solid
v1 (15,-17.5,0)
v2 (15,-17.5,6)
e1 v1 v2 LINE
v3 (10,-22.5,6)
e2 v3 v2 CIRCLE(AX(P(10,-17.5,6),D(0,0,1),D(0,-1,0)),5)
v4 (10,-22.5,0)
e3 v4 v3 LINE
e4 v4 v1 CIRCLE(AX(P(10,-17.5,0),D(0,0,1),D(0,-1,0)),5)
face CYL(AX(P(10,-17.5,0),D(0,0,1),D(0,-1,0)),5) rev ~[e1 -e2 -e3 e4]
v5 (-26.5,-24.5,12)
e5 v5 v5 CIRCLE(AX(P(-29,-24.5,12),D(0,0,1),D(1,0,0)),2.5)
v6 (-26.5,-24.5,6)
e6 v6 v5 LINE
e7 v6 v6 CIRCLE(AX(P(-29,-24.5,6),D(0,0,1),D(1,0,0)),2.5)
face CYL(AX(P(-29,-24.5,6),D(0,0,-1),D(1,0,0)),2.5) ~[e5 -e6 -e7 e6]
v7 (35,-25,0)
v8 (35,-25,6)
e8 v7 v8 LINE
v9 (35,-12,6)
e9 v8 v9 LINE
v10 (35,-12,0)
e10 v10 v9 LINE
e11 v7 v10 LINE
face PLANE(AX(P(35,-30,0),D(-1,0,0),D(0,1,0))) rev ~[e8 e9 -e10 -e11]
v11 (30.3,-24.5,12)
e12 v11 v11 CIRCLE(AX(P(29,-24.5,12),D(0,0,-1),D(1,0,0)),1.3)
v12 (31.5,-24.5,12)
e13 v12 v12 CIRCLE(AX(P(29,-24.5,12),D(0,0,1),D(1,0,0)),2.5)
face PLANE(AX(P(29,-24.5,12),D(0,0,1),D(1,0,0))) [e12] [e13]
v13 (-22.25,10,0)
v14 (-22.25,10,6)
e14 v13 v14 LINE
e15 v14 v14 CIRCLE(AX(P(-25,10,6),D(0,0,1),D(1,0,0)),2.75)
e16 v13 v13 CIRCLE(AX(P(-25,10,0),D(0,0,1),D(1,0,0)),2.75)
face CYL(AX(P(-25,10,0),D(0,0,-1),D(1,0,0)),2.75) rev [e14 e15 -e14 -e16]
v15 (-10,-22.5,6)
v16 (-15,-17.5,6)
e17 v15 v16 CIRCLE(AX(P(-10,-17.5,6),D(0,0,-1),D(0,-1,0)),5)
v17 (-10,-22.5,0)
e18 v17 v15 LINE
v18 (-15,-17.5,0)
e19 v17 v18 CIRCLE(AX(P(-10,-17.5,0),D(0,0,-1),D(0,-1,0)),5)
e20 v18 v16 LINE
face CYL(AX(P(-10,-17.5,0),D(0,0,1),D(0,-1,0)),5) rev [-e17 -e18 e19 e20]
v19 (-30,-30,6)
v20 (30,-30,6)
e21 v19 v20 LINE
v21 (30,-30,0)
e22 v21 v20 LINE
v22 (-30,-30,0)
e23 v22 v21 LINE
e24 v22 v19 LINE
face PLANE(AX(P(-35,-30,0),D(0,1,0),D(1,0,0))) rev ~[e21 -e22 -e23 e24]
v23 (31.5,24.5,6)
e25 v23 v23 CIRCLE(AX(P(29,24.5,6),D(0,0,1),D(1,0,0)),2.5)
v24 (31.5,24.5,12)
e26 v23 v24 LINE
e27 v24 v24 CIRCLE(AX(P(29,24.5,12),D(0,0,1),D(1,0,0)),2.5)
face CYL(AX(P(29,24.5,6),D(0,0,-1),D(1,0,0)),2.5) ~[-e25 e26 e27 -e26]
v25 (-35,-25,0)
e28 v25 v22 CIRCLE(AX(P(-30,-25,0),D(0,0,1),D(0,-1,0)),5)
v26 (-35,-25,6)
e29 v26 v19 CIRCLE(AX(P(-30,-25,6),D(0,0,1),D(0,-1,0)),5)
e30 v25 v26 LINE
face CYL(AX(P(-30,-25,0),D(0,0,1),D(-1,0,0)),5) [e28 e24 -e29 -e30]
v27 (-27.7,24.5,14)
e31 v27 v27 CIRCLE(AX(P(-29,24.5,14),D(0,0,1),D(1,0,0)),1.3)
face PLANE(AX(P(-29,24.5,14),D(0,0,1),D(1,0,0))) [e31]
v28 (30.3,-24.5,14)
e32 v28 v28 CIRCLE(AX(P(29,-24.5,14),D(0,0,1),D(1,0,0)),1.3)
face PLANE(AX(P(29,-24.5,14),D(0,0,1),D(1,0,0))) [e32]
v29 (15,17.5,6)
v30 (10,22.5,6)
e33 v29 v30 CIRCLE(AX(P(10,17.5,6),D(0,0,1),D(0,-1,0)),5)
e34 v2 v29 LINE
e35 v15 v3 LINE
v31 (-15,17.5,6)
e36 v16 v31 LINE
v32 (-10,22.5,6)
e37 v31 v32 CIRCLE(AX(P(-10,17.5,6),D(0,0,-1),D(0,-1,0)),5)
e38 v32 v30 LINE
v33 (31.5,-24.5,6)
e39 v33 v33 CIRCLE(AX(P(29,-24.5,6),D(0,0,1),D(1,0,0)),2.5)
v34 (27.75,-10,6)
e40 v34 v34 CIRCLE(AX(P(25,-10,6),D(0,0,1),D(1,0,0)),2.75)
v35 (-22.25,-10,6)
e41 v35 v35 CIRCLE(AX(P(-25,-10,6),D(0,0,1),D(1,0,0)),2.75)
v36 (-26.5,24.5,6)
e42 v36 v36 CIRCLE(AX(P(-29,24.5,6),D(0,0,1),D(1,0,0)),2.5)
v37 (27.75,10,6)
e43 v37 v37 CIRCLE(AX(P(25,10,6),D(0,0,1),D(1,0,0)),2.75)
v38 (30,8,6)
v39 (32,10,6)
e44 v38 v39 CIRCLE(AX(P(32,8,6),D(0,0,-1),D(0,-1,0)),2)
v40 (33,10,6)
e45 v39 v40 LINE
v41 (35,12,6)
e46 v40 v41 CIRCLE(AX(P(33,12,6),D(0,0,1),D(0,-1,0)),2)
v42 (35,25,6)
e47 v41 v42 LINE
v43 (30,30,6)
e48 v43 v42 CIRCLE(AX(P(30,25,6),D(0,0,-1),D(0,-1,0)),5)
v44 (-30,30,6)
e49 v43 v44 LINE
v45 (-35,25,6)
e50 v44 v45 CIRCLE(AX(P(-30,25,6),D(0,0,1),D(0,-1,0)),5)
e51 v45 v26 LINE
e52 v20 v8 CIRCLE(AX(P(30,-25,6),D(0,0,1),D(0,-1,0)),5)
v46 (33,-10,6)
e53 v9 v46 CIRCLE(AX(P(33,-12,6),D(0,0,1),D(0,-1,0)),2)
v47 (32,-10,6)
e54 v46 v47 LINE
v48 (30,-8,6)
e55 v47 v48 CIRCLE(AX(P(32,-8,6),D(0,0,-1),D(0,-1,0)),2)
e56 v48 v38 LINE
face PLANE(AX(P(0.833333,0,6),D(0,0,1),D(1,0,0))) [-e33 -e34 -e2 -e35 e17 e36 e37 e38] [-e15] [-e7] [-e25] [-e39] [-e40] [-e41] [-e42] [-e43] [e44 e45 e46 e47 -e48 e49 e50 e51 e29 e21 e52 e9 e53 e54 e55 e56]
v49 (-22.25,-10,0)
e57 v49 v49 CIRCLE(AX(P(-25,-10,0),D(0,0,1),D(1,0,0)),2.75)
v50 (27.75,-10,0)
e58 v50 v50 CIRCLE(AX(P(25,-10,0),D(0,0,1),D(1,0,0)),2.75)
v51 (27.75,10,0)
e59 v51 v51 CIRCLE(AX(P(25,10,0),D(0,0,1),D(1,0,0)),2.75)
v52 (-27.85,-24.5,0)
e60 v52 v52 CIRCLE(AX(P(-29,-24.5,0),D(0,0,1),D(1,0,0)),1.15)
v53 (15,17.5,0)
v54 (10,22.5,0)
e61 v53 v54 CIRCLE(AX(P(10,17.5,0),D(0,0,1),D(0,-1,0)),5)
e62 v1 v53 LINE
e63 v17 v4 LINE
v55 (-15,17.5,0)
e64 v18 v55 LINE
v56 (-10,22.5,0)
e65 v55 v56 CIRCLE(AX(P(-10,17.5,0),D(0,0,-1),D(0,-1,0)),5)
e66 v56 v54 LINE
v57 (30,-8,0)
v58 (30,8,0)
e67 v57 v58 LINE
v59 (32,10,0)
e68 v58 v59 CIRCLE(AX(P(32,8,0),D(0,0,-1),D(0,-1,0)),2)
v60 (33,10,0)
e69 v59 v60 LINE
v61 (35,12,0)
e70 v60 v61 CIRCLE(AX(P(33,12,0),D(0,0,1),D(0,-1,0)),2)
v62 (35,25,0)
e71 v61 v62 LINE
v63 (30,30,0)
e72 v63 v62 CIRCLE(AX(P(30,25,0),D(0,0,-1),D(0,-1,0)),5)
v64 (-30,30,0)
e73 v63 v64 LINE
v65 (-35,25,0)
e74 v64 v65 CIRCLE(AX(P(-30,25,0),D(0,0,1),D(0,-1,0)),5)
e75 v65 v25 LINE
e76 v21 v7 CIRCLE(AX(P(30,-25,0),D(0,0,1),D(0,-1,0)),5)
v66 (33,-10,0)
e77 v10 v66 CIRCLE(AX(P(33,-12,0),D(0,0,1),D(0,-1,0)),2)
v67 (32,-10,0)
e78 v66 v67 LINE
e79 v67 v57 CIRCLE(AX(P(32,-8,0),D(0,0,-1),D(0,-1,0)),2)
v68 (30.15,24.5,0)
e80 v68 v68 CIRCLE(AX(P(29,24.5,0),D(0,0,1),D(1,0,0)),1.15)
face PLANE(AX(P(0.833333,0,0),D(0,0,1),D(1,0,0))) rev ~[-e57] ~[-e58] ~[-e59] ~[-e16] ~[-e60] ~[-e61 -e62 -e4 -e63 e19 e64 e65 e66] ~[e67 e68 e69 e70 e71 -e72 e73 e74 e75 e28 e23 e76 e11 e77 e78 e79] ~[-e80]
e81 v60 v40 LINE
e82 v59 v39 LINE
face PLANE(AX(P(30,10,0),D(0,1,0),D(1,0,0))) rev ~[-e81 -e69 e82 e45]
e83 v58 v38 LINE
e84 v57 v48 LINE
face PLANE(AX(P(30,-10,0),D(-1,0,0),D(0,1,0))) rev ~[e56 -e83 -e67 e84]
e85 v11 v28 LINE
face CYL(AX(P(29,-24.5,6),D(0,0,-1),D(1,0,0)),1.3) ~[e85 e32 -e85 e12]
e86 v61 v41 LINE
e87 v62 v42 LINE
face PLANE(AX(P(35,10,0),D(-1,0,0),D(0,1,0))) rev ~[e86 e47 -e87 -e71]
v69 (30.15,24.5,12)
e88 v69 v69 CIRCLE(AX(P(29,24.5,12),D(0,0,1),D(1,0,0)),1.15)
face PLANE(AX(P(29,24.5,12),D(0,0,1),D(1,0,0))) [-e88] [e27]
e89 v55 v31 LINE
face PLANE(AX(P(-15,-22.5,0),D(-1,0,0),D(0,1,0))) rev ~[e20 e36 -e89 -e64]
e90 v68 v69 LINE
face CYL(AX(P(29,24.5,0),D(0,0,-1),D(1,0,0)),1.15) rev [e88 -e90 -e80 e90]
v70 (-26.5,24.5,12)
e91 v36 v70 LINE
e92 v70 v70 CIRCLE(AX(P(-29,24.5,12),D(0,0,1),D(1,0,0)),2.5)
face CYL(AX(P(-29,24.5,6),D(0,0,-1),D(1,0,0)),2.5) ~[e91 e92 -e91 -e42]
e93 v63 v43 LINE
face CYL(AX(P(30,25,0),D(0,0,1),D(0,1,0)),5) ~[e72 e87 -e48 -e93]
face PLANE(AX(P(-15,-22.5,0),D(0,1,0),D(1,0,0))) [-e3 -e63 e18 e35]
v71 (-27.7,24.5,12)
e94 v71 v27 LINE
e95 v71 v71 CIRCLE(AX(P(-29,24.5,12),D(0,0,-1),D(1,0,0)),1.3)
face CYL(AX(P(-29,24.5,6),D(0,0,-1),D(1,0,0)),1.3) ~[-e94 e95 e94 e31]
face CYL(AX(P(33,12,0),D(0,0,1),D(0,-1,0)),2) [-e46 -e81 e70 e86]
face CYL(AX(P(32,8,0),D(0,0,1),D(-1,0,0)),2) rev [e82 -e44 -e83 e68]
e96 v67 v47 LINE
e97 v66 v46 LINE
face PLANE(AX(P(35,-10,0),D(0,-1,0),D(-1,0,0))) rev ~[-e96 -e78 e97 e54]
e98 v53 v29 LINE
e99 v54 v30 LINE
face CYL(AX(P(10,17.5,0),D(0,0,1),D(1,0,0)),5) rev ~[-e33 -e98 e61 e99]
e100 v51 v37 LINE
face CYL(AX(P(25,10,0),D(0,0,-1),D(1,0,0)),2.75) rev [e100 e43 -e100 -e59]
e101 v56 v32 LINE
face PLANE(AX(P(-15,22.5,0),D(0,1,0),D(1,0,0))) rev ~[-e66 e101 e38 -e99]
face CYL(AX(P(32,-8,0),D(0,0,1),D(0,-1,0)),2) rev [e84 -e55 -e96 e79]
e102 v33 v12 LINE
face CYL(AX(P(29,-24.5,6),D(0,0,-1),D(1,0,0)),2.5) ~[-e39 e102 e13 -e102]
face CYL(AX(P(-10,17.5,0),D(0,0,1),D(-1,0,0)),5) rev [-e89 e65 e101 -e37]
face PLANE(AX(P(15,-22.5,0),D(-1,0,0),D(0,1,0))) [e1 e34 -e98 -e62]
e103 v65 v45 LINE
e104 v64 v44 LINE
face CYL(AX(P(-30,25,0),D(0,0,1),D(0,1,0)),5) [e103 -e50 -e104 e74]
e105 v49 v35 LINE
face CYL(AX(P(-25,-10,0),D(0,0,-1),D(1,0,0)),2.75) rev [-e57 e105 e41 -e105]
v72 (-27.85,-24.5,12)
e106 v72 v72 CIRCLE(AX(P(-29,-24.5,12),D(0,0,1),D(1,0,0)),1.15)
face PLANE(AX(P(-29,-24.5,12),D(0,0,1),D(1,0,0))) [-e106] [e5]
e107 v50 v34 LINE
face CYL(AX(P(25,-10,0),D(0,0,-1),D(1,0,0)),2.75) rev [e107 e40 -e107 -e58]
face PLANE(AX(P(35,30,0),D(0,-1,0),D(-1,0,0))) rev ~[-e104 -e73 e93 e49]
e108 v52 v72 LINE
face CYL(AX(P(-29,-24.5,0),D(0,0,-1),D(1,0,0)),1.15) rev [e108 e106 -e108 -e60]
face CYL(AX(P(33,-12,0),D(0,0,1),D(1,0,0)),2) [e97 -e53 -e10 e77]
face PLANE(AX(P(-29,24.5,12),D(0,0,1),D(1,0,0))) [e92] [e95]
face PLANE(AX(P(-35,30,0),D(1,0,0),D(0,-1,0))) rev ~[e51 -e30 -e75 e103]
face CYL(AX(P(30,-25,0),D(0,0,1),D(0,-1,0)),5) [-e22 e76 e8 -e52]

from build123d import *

# Parameters (mm, degrees)
F0_R     = 1.15
F0_R_2   = 2.75
F0_W     = 30
F0_H     = 45
F1_DEPTH = 6
F2_R     = 5
F4_R     = 2.5
F5_DEPTH = 6
F3_R     = 1.3
F6_DEPTH = 8
F7_R     = 1.15
F8_DEPTH = 25
F9_R     = 2


# Not quite as in the source:
# - a feature names something its author has since deleted; it is built from what else it names


with BuildPart() as f1:
    # F0 (on Top) → F1 (new body)
    with BuildSketch(Plane.XY):
        Polygon((35, 30), (-35, 30), (-35, -30), (35, -30), (35, -10), (30, -10), (30, 10), (35, 10), align=None)
        with Locations((-29, -24.5)):
            Circle(F0_R, mode=Mode.SUBTRACT)
        with Locations((-25, -10)):
            Circle(F0_R_2, mode=Mode.SUBTRACT)
        with Locations((25, -10)):
            Circle(F0_R_2, mode=Mode.SUBTRACT)
        with Locations((-25, 10)):
            Circle(F0_R_2, mode=Mode.SUBTRACT)
        Rectangle(F0_W, F0_H, mode=Mode.SUBTRACT)
        with Locations((25, 10)):
            Circle(F0_R_2, mode=Mode.SUBTRACT)
        with Locations((29, 24.5)):
            Circle(F0_R, mode=Mode.SUBTRACT)
    extrude(amount=F1_DEPTH)

    # F2
    f2_edges = [f1.edges().sort_by_distance(p)[0] for p in [
        (-35, -30, 3),
        (-35, 30, 3),
        (-15, 22.5, 3),
        (15, 22.5, 3),
        (15, -22.5, 3),
        (-15, -22.5, 3),
        (35, 30, 3),
        (35, -30, 3),
    ]]
    fillet(f2_edges, radius=F2_R)

    # F4 (on face) → F5 (join)
    with BuildSketch(Plane.XY.offset(6)):
        with Locations((-29, 24.5)):
            Circle(F4_R)
        with Locations((29, 24.5)):
            Circle(F4_R)
        with Locations((29, -24.5)):
            Circle(F4_R)
        with Locations((-29, -24.5)):
            Circle(F4_R)
    extrude(amount=F5_DEPTH)

    # F3 (on face) → F6 (join)
    with BuildSketch(Plane.XY.offset(6)):
        with Locations((-29, 24.5)):
            Circle(F3_R)
        with Locations((29, -24.5)):
            Circle(F3_R)
    extrude(amount=F6_DEPTH)

    # F7 (on face) → F8 (cut)
    with BuildSketch(Plane.XY.offset(12)):
        with Locations((-29, -24.5)):
            Circle(F7_R)
        with Locations((29, 24.5)):
            Circle(F7_R)
    extrude(amount=-F8_DEPTH, mode=Mode.SUBTRACT)

    # F9
    f9_edges = [f1.edges().sort_by_distance(p)[0] for p in [
        (35, 10, 3),
        (30, 10, 3),
        (30, -10, 3),
        (35, -10, 3),
    ]]
    fillet(f9_edges, radius=F9_R)


solid = f1.part
